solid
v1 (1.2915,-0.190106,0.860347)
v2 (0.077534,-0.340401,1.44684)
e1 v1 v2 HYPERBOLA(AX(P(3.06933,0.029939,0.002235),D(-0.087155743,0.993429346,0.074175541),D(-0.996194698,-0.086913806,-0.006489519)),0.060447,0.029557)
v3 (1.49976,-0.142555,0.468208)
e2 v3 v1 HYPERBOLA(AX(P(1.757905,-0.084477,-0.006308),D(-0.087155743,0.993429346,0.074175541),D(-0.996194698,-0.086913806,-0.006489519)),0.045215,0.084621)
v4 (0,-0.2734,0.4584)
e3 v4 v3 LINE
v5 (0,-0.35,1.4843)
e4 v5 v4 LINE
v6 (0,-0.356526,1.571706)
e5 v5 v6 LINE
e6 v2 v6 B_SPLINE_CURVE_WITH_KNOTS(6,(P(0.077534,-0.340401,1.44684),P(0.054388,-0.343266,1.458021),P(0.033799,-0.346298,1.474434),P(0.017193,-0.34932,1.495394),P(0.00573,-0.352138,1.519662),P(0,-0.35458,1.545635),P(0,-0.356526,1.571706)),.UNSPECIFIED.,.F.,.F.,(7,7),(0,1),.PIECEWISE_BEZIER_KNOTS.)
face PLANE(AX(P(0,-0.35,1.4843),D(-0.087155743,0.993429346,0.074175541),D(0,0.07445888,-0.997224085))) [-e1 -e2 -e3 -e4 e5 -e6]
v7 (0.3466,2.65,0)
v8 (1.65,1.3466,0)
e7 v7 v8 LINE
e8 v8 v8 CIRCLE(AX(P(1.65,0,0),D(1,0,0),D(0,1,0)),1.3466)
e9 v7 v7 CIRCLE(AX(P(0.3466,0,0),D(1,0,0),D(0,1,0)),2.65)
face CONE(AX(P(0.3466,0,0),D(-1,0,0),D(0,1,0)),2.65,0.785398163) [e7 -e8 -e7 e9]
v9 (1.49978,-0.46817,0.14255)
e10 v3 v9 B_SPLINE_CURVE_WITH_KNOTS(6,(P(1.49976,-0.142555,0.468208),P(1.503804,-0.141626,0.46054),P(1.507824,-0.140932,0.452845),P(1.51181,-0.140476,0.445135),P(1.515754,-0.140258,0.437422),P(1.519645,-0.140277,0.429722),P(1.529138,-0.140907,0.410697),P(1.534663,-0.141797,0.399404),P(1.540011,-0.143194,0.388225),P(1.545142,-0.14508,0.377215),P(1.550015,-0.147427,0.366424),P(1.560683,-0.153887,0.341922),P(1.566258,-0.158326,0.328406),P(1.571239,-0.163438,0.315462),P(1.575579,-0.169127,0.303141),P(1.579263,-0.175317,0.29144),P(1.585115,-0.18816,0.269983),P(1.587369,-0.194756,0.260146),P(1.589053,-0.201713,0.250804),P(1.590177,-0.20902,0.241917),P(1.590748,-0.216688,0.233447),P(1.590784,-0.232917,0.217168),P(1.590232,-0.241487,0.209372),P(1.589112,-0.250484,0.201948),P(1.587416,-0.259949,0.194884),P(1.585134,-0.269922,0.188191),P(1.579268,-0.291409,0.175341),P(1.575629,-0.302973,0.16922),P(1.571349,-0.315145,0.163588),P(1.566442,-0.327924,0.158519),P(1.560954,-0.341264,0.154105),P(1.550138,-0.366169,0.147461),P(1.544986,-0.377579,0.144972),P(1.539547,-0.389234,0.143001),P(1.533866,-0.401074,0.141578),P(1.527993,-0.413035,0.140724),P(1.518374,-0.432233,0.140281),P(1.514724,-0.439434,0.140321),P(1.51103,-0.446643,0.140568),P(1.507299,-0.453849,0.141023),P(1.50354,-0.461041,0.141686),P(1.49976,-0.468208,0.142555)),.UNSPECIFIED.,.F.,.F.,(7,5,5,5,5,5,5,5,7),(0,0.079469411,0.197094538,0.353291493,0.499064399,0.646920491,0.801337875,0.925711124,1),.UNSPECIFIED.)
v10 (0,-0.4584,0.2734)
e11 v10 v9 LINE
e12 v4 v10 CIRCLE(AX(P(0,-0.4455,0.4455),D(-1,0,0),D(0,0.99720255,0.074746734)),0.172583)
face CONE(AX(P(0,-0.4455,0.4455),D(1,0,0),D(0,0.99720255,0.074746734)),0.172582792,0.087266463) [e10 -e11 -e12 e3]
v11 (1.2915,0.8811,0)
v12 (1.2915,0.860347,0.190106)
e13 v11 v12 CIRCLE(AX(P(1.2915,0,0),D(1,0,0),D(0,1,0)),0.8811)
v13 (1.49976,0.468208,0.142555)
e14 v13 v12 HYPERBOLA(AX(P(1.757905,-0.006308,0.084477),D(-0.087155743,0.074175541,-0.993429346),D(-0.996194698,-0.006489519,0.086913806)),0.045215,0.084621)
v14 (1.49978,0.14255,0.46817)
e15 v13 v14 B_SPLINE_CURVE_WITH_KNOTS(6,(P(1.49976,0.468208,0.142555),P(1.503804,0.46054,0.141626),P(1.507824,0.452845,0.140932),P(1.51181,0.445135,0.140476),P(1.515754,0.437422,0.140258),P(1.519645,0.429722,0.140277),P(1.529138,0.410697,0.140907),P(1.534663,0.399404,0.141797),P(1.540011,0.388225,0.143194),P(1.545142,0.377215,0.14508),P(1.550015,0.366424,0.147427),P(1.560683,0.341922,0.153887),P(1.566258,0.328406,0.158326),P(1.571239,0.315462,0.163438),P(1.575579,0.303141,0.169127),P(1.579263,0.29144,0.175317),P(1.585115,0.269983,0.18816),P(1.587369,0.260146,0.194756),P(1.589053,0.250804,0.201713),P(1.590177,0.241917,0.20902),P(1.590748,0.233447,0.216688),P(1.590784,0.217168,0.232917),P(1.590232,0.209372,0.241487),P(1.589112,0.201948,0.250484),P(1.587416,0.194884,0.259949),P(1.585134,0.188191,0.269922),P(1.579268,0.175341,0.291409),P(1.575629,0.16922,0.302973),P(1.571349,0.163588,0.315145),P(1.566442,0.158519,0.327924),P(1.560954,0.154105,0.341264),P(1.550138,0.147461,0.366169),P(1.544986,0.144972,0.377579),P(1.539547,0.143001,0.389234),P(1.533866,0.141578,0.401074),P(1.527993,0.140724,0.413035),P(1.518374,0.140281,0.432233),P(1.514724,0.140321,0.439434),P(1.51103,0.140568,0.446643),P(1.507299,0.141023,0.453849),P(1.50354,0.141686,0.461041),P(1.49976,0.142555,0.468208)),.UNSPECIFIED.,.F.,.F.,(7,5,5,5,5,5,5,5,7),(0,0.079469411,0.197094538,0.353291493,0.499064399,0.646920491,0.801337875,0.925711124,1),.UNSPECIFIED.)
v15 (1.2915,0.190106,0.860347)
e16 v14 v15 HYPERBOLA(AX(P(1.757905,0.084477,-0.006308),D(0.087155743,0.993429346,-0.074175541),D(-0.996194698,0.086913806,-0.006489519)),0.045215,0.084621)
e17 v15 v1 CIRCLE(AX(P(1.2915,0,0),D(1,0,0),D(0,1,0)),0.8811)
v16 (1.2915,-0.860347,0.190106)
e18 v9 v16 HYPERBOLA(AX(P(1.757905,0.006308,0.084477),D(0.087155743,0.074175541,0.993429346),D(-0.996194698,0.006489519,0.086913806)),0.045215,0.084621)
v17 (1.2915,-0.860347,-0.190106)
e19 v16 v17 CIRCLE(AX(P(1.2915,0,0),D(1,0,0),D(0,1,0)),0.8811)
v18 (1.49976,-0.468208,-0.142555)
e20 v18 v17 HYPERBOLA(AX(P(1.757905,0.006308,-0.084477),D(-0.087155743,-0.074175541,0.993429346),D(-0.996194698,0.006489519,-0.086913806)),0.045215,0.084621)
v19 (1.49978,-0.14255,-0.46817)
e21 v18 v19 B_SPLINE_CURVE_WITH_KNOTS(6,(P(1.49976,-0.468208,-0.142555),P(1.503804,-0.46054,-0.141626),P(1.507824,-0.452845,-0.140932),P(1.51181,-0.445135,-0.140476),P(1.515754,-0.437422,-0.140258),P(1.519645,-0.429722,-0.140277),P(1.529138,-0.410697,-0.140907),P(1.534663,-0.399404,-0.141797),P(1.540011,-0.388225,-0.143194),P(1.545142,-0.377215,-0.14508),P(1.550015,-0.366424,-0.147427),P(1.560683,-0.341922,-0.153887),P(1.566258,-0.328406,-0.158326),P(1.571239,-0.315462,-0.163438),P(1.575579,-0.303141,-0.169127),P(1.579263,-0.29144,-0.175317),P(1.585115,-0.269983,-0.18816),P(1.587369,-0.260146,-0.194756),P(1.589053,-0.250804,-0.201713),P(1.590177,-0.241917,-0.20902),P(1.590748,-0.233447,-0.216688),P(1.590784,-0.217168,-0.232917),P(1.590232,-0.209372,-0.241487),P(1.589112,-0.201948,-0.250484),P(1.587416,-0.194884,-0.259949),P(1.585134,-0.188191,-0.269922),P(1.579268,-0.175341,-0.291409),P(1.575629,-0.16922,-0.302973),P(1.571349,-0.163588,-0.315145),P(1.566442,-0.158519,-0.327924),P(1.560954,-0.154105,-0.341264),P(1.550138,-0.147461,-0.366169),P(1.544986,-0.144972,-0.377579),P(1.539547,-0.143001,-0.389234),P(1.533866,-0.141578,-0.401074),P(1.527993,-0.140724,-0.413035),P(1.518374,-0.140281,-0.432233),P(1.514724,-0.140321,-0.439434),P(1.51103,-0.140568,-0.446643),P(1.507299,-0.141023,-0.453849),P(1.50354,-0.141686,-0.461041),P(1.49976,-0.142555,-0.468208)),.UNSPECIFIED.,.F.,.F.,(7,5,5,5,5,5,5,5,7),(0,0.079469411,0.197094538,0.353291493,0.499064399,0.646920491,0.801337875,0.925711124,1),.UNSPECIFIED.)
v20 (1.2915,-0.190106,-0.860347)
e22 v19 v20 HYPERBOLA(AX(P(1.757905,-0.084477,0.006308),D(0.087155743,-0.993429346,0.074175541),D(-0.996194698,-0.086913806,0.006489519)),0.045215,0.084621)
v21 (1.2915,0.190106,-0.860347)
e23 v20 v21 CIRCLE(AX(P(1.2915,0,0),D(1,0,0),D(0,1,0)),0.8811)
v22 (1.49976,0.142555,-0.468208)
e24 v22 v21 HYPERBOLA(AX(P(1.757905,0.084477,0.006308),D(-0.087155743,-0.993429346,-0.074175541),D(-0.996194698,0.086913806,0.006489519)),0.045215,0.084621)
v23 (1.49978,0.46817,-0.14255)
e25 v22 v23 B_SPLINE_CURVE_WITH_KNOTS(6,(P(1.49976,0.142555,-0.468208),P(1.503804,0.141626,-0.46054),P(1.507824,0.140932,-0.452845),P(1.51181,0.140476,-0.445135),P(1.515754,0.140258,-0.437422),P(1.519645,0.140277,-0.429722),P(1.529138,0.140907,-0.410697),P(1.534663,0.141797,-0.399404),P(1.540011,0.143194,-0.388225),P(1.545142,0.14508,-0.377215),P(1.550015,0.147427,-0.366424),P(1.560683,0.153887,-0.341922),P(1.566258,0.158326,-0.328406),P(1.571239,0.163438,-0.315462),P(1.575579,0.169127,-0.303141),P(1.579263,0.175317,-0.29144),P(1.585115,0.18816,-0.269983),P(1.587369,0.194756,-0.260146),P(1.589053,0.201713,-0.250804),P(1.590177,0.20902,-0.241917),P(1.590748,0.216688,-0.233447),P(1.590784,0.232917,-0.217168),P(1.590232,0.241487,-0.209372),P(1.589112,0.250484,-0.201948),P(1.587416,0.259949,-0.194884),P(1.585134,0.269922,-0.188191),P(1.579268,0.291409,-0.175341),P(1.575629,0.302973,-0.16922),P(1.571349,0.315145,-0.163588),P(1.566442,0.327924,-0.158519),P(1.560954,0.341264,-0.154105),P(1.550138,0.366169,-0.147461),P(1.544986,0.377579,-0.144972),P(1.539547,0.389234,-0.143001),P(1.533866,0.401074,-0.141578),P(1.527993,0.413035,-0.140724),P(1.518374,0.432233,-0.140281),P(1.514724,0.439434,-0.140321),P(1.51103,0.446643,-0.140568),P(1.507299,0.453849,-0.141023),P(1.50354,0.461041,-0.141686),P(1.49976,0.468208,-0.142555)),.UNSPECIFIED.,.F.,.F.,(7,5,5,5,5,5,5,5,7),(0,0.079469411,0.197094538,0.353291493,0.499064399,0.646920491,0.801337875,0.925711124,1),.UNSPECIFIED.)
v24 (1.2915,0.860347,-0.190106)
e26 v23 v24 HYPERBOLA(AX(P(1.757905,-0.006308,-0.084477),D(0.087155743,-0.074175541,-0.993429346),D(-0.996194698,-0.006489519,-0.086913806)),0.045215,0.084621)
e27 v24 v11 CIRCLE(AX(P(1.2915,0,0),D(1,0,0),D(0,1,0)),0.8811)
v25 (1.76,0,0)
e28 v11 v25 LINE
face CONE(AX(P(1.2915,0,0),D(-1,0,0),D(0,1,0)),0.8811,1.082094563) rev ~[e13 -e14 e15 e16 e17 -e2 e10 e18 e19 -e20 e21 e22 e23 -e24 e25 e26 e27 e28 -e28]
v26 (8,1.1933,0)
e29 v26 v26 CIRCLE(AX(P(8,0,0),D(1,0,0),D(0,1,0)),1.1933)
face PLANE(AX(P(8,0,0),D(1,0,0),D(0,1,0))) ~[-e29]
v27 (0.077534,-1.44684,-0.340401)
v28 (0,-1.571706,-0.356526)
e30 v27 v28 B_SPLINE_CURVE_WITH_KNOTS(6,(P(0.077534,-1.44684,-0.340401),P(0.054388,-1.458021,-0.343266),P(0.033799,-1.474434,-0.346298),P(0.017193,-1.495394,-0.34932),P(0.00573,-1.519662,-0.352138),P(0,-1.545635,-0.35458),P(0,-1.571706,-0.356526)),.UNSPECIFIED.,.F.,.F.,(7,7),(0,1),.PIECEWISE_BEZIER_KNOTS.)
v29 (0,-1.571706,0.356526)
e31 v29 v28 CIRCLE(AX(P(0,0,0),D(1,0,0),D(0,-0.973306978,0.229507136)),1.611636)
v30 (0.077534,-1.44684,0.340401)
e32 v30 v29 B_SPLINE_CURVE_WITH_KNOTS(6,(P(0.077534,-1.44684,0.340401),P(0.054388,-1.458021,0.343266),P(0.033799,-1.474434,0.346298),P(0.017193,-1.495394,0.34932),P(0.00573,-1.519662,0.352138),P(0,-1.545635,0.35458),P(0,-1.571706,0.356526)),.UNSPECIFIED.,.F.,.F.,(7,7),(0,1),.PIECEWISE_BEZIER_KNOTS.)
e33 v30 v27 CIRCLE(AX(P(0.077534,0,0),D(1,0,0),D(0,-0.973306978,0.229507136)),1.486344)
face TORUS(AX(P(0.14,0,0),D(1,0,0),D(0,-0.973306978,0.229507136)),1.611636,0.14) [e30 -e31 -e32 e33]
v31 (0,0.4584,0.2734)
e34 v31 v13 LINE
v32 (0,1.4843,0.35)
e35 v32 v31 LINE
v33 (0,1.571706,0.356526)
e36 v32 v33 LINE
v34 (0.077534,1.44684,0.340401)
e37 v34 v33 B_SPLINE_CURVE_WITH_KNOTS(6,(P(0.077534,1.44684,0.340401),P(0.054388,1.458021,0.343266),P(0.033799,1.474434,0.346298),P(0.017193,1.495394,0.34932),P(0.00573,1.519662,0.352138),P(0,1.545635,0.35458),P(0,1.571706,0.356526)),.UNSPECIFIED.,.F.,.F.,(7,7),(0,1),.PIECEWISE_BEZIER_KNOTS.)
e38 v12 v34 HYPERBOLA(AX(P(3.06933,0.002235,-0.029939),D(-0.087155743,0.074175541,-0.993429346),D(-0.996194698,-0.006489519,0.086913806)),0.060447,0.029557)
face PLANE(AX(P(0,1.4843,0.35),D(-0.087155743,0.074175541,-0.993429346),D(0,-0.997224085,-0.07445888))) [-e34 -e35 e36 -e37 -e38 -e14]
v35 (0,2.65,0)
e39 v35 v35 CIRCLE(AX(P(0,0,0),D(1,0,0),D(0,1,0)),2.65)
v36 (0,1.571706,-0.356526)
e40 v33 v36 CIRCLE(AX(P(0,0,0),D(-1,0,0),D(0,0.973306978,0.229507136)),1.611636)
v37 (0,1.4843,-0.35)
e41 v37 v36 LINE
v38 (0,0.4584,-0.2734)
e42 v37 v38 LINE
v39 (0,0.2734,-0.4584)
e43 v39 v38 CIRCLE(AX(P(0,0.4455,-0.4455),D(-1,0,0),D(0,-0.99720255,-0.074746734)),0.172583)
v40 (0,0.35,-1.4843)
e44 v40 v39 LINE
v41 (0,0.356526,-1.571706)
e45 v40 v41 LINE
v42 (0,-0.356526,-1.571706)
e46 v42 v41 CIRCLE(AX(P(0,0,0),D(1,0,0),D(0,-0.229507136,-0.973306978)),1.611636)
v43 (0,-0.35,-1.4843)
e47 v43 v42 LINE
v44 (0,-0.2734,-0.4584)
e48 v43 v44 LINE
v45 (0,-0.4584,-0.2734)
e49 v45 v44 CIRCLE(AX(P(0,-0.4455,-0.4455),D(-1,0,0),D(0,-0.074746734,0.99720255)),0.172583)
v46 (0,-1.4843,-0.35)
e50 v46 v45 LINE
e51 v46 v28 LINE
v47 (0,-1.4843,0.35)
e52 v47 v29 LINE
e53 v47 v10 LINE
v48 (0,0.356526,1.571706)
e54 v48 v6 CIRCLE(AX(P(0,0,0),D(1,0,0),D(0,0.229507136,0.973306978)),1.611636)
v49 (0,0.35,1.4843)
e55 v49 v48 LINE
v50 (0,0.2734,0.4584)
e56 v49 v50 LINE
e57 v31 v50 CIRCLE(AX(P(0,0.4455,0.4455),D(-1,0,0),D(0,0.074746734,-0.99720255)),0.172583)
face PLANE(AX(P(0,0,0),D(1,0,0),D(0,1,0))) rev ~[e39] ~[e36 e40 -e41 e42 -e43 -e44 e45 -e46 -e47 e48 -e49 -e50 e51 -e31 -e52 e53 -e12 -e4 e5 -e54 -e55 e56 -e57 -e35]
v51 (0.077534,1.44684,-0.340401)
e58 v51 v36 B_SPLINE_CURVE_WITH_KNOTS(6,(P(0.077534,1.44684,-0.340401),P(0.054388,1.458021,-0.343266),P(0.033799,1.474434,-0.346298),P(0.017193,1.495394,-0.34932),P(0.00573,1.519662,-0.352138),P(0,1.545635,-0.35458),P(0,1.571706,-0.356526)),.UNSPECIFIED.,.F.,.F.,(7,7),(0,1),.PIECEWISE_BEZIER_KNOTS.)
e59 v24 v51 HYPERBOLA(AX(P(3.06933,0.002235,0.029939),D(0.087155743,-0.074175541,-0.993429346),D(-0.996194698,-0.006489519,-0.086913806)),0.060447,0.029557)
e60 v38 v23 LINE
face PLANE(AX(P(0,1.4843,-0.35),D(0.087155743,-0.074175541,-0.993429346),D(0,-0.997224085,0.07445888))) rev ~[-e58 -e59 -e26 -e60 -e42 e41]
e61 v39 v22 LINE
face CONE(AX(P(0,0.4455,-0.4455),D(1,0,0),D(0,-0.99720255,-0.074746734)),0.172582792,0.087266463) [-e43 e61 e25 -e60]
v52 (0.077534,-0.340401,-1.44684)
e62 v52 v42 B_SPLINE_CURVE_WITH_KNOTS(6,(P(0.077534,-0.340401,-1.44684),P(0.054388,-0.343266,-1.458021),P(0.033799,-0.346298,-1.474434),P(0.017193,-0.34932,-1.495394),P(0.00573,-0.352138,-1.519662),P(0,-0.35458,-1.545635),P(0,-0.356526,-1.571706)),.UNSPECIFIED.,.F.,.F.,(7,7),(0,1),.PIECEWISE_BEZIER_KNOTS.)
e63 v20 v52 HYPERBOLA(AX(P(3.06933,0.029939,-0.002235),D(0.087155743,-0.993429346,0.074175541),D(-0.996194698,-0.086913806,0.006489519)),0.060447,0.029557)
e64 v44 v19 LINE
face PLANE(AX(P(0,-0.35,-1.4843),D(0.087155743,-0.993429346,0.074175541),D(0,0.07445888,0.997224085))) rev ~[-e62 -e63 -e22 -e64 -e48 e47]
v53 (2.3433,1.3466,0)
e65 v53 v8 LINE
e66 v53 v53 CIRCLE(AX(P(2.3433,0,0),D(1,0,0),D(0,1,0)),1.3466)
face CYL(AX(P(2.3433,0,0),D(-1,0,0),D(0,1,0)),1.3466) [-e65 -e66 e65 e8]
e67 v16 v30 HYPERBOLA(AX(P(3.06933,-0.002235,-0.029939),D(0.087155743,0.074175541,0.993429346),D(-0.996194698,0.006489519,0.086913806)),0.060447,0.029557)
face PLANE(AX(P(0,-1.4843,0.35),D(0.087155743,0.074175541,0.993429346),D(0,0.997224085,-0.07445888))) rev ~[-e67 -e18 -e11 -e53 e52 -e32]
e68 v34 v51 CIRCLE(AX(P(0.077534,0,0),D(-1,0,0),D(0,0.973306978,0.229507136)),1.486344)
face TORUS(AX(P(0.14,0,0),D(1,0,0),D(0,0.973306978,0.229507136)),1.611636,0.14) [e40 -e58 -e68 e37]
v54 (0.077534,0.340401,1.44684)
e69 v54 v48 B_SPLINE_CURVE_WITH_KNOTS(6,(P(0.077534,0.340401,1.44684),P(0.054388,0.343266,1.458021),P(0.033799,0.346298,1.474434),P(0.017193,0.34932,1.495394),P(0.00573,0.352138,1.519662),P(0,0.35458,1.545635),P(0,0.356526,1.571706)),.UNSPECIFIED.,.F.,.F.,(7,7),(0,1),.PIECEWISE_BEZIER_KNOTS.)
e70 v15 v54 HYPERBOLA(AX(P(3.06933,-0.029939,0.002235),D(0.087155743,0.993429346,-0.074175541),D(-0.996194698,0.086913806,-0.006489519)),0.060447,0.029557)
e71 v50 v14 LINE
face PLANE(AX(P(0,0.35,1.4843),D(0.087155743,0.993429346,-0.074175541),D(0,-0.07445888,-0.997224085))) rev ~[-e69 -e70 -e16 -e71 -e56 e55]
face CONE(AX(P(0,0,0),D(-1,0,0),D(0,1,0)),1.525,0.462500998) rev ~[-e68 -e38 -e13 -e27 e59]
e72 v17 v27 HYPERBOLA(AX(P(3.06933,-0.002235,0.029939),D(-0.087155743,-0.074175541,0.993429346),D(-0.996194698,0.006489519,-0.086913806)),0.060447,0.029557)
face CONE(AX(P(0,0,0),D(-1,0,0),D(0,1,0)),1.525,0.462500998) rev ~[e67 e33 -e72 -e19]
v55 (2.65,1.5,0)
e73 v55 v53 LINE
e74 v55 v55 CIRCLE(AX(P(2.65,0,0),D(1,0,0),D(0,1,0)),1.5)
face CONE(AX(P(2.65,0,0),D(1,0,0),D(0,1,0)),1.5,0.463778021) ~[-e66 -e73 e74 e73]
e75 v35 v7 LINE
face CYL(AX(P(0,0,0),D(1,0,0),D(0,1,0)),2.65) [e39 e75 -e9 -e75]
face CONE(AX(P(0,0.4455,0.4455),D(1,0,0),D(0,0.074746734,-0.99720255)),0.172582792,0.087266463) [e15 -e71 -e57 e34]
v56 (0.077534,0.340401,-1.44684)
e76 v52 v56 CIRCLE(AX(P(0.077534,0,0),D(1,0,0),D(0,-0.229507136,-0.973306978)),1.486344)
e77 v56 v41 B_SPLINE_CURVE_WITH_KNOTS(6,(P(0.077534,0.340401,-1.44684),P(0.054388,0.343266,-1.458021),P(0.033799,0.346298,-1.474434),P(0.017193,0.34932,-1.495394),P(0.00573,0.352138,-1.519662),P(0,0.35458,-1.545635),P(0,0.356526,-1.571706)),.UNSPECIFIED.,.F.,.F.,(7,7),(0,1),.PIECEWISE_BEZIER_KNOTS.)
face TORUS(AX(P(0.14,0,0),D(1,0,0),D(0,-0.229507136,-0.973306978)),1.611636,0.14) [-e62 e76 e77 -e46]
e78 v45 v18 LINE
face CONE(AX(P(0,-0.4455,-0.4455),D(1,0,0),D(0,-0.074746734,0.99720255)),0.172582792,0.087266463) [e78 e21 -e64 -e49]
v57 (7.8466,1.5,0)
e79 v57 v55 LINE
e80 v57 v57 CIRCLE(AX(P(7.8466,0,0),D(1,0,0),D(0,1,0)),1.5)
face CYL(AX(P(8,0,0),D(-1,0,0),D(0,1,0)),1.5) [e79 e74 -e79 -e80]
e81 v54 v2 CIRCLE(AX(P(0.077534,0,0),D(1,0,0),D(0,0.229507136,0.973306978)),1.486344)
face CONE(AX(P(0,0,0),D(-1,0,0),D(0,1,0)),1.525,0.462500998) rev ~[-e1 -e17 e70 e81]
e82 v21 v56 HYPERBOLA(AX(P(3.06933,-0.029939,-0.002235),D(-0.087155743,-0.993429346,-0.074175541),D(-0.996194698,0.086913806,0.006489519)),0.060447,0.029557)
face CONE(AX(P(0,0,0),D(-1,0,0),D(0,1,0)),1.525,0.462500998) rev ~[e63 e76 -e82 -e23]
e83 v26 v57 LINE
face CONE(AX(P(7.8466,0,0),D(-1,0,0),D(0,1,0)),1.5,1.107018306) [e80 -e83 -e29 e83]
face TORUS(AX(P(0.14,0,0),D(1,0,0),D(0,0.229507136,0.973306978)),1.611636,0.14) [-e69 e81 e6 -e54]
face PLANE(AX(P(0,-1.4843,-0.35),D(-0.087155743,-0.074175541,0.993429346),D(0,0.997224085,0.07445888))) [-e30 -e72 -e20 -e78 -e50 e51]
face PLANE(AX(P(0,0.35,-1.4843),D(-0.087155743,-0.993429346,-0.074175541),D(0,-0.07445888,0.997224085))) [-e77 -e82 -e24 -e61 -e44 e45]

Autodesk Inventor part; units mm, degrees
ref_plane "YZ Plane" through (0, 0, 0) normal (1, 0, 0) x (0, 1, 0)
ref_plane "XZ Plane" through (0, 0, 0) normal (0, 1, 0) x (-1, 0, 0)
sketch "Sketch1" plane through (0, 0, 0) normal (0, 0, 1) x (1, 0, 0)
  line L0 (1.76, 0) -> (8, 0)
  line L1 (8, 0) -> (8, 1.5)
  line L2 (8, 1.5) -> (2.65, 1.5)
  line L3 (2.65, 1.5) -> (2.3433, 1.3466)
  line L4 (2.3433, 1.3466) -> (1.65, 1.3466)
  line L5 (0, 2.65) -> (0, 1.525)
  line L6 (0, 1.525) -> (1.2915, 0.8811)
  line L7 (1.2915, 0.8811) -> (1.76, 0)
  line L8 (-1.6, 0) -> (9.6, 0) projected
  line L9 (0, -0.53) -> (0, 3.18) projected
  line L10 (0, 2.65) -> (0.3466, 2.65)
  line L11 (0.3466, 2.65) -> (1.65, 1.3466)
  line L12 (2.65, 1.5) -> (1.4966, 1.5) construction
  dimension "d1" = 5.35
  dimension "d2" = 3
  dimension "d3" = 2.6933
  dimension "d4" = 3.05
  dimension "d5" = 26.5
  dimension "d6" = 62
  dimension "d7" = 1.76
  dimension "d8" = 0.3067
  dimension "d12" = 5.3
  dimension "d13" = 45
  dimension "d15" = 8
  dimension "d24" = 1.65
revolve "Body" add sketch "Sketch1" angle 360 about axis through (1.76, 0, 0) along (1, 0, 0) contours L7 L6 L5 L10 L11 L4 L3 L2 L1 L0
sketch "Sketch2" plane through (0, 0, 0) normal (-1, 0, 0) x (0, 0, 1)
  line L0 (0, 1.525) -> (0, 0) construction
  line L1 (0, 0) -> (1.525, 0) construction
  arc A0 (0.4575, 0) -> (0, 0.4575) centre (0, 0) ccw construction
  arc A1 (0.5338, 0) -> (0, 0.5337) centre (0, 0) ccw construction
  arc A2 (1.4843, 0.35) -> (0.35, 1.4843) centre (0, 0) ccw
  line L2 (0, 0) -> (1.0783, 1.0783) construction
  line L3 (0.35, 1.4843) -> (0.2734, 0.4584)
  line L4 (1.4843, 0.35) -> (0.4584, 0.2734)
  arc A3 (0.35, 1.4843) -> (0, 1.525) centre (0, 0) ccw
  arc A4 (1.525, 0) -> (1.4843, 0.35) centre (0, 0) ccw
  line L5 (0, -3.71) -> (0, 3.71) projected
  line L6 (-3.71, 0) -> (3.71, 0) projected
  arc A5 (0.35, -1.4843) -> (1.4843, -0.35) centre (0, 0) ccw
  line L7 (0.35, -1.4843) -> (0.2734, -0.4584)
  line L8 (1.4843, -0.35) -> (0.4584, -0.2734)
  arc A6 (0, -1.525) -> (0.35, -1.4843) centre (0, 0) ccw
  arc A7 (1.4843, -0.35) -> (1.525, 0) centre (0, 0) ccw
  arc A8 (-0.35, 1.4843) -> (-1.4843, 0.35) centre (0, 0) ccw
  line L9 (-0.35, 1.4843) -> (-0.2734, 0.4584)
  line L10 (-1.4843, 0.35) -> (-0.4584, 0.2734)
  arc A9 (0, 1.525) -> (-0.35, 1.4843) centre (0, 0) ccw
  arc A10 (-1.4843, 0.35) -> (-1.525, 0) centre (0, 0) ccw
  arc A11 (-0.35, -1.4843) -> (0, -1.525) centre (0, 0) ccw
  arc A12 (-1.4843, -0.35) -> (-0.35, -1.4843) centre (0, 0) ccw
  arc A13 (-1.525, 0) -> (-1.4843, -0.35) centre (0, 0) ccw
  line L11 (-1.4843, -0.35) -> (-0.4584, -0.2734)
  line L12 (-0.35, -1.4843) -> (-0.2734, -0.4584)
  arc A14 (0.2734, 0.4584) -> (0.4584, 0.2734) centre (0.4455, 0.4455) ccw
  arc A15 (0.4584, -0.2734) -> (0.2734, -0.4584) centre (0.4455, -0.4455) ccw
  arc A16 (-0.4584, 0.2734) -> (-0.2734, 0.4584) centre (-0.4455, 0.4455) ccw
  arc A17 (-0.2734, -0.4584) -> (-0.4584, -0.2734) centre (-0.4455, -0.4455) ccw
  point P0 (1.0783, -1.0783)
  point P1 (-1.0783, 1.0783)
  point P2 (-1.0783, -1.0783)
  dimension "d17" = 0.915
  dimension "d18" = 1.0675
  dimension "d19" = 3.05
  dimension "d20" = 45
  dimension "d21" = 0.35
extrude "Slot" add sketch "Sketch2" against normal up to next draft 5 contours L4 A14 L3 A2 | A5 L7 A15 L8 | L9 A16 L10 A8 | A12 L11 A17 L12
fillet "Fillet1" radius 0.14 4 edges at (0, 1.525, 0) (0, 0, -1.525) (0, -1.525, 0) (0, 0, 1.525)
thread "Thread" size "M3x0.5" class "6g" standard "ISO Metric profile" length 5.35
chamfer "Chamfer1" distance 0.3067 distance2 0.1534 1 edges at (8, -1.5, 0) measured on face at (8, 0.3888, 0.4512)
ref_plane "Work Plane2" through (3.35, 0, 0) normal (0, 0, -1) x (1, 0, 0)
equation "\"d1\" = GEL"
equation "\"d2\" = GD"
equation "\"d3\" = BDM"
equation "\"d4\" = SDM"
equation "\"d7\" = INTI"
equation "\"d8\" = GAL"
equation "\"d12\" = KOD"
equation "\"d13\" = 0.5 * SEWI"
equation "\"d15\" = NLG"
equation "\"d24\" = KOH"
equation "\"d17\" = 0.3 * SDM"
equation "\"d18\" = 0.35 * SDM"
equation "\"d19\" = SDM"
equation "\"d21\" = 0.5 * SBR"
equation "\"d23\" = 0.2 * SBR"
equation "\"d10\" = GEL"
equation "\"d25\" = -0.5 * SPD + 0.5 * GD"
equation "\"d26\" = 0.5 * GAL"
equation "\"NLG\" = 8"
equation "\"GEL\" = 5.35"
equation "\"GAL\" = 0.61345 * PTC"
equation "\"SPD\" = NND - 1.2269 * PTC"
equation "\"KOD\" = 5.3"
equation "\"KOH\" = 1.65"
equation "\"SBR\" = 0.7"
equation "\"INTI\" = 1.76"
equation "\"SDM\" = 3.05"
equation "\"GD\" = NND"
equation "\"BDM\" = NND - GAL"
equation "\"SEWI\" = 90deg"
equation "\"d9\" = SDM"
equation "\"GUL\" = 0.61345 * PTC"
equation "\"TOA\" = 30deg"
equation "\"EPV\" = 3.15"
equation "\"THREADDIA\" = 3"
equation "\"RR\" = 0.3"
equation "\"PTC\" = 0.5"
equation "\"NND\" = 3"
equation "\"GD1\" = THREADDIA - 1.2269 * PTC"
properties part number "AS 1427 - M3 x 8" material "Steel, Mild"
